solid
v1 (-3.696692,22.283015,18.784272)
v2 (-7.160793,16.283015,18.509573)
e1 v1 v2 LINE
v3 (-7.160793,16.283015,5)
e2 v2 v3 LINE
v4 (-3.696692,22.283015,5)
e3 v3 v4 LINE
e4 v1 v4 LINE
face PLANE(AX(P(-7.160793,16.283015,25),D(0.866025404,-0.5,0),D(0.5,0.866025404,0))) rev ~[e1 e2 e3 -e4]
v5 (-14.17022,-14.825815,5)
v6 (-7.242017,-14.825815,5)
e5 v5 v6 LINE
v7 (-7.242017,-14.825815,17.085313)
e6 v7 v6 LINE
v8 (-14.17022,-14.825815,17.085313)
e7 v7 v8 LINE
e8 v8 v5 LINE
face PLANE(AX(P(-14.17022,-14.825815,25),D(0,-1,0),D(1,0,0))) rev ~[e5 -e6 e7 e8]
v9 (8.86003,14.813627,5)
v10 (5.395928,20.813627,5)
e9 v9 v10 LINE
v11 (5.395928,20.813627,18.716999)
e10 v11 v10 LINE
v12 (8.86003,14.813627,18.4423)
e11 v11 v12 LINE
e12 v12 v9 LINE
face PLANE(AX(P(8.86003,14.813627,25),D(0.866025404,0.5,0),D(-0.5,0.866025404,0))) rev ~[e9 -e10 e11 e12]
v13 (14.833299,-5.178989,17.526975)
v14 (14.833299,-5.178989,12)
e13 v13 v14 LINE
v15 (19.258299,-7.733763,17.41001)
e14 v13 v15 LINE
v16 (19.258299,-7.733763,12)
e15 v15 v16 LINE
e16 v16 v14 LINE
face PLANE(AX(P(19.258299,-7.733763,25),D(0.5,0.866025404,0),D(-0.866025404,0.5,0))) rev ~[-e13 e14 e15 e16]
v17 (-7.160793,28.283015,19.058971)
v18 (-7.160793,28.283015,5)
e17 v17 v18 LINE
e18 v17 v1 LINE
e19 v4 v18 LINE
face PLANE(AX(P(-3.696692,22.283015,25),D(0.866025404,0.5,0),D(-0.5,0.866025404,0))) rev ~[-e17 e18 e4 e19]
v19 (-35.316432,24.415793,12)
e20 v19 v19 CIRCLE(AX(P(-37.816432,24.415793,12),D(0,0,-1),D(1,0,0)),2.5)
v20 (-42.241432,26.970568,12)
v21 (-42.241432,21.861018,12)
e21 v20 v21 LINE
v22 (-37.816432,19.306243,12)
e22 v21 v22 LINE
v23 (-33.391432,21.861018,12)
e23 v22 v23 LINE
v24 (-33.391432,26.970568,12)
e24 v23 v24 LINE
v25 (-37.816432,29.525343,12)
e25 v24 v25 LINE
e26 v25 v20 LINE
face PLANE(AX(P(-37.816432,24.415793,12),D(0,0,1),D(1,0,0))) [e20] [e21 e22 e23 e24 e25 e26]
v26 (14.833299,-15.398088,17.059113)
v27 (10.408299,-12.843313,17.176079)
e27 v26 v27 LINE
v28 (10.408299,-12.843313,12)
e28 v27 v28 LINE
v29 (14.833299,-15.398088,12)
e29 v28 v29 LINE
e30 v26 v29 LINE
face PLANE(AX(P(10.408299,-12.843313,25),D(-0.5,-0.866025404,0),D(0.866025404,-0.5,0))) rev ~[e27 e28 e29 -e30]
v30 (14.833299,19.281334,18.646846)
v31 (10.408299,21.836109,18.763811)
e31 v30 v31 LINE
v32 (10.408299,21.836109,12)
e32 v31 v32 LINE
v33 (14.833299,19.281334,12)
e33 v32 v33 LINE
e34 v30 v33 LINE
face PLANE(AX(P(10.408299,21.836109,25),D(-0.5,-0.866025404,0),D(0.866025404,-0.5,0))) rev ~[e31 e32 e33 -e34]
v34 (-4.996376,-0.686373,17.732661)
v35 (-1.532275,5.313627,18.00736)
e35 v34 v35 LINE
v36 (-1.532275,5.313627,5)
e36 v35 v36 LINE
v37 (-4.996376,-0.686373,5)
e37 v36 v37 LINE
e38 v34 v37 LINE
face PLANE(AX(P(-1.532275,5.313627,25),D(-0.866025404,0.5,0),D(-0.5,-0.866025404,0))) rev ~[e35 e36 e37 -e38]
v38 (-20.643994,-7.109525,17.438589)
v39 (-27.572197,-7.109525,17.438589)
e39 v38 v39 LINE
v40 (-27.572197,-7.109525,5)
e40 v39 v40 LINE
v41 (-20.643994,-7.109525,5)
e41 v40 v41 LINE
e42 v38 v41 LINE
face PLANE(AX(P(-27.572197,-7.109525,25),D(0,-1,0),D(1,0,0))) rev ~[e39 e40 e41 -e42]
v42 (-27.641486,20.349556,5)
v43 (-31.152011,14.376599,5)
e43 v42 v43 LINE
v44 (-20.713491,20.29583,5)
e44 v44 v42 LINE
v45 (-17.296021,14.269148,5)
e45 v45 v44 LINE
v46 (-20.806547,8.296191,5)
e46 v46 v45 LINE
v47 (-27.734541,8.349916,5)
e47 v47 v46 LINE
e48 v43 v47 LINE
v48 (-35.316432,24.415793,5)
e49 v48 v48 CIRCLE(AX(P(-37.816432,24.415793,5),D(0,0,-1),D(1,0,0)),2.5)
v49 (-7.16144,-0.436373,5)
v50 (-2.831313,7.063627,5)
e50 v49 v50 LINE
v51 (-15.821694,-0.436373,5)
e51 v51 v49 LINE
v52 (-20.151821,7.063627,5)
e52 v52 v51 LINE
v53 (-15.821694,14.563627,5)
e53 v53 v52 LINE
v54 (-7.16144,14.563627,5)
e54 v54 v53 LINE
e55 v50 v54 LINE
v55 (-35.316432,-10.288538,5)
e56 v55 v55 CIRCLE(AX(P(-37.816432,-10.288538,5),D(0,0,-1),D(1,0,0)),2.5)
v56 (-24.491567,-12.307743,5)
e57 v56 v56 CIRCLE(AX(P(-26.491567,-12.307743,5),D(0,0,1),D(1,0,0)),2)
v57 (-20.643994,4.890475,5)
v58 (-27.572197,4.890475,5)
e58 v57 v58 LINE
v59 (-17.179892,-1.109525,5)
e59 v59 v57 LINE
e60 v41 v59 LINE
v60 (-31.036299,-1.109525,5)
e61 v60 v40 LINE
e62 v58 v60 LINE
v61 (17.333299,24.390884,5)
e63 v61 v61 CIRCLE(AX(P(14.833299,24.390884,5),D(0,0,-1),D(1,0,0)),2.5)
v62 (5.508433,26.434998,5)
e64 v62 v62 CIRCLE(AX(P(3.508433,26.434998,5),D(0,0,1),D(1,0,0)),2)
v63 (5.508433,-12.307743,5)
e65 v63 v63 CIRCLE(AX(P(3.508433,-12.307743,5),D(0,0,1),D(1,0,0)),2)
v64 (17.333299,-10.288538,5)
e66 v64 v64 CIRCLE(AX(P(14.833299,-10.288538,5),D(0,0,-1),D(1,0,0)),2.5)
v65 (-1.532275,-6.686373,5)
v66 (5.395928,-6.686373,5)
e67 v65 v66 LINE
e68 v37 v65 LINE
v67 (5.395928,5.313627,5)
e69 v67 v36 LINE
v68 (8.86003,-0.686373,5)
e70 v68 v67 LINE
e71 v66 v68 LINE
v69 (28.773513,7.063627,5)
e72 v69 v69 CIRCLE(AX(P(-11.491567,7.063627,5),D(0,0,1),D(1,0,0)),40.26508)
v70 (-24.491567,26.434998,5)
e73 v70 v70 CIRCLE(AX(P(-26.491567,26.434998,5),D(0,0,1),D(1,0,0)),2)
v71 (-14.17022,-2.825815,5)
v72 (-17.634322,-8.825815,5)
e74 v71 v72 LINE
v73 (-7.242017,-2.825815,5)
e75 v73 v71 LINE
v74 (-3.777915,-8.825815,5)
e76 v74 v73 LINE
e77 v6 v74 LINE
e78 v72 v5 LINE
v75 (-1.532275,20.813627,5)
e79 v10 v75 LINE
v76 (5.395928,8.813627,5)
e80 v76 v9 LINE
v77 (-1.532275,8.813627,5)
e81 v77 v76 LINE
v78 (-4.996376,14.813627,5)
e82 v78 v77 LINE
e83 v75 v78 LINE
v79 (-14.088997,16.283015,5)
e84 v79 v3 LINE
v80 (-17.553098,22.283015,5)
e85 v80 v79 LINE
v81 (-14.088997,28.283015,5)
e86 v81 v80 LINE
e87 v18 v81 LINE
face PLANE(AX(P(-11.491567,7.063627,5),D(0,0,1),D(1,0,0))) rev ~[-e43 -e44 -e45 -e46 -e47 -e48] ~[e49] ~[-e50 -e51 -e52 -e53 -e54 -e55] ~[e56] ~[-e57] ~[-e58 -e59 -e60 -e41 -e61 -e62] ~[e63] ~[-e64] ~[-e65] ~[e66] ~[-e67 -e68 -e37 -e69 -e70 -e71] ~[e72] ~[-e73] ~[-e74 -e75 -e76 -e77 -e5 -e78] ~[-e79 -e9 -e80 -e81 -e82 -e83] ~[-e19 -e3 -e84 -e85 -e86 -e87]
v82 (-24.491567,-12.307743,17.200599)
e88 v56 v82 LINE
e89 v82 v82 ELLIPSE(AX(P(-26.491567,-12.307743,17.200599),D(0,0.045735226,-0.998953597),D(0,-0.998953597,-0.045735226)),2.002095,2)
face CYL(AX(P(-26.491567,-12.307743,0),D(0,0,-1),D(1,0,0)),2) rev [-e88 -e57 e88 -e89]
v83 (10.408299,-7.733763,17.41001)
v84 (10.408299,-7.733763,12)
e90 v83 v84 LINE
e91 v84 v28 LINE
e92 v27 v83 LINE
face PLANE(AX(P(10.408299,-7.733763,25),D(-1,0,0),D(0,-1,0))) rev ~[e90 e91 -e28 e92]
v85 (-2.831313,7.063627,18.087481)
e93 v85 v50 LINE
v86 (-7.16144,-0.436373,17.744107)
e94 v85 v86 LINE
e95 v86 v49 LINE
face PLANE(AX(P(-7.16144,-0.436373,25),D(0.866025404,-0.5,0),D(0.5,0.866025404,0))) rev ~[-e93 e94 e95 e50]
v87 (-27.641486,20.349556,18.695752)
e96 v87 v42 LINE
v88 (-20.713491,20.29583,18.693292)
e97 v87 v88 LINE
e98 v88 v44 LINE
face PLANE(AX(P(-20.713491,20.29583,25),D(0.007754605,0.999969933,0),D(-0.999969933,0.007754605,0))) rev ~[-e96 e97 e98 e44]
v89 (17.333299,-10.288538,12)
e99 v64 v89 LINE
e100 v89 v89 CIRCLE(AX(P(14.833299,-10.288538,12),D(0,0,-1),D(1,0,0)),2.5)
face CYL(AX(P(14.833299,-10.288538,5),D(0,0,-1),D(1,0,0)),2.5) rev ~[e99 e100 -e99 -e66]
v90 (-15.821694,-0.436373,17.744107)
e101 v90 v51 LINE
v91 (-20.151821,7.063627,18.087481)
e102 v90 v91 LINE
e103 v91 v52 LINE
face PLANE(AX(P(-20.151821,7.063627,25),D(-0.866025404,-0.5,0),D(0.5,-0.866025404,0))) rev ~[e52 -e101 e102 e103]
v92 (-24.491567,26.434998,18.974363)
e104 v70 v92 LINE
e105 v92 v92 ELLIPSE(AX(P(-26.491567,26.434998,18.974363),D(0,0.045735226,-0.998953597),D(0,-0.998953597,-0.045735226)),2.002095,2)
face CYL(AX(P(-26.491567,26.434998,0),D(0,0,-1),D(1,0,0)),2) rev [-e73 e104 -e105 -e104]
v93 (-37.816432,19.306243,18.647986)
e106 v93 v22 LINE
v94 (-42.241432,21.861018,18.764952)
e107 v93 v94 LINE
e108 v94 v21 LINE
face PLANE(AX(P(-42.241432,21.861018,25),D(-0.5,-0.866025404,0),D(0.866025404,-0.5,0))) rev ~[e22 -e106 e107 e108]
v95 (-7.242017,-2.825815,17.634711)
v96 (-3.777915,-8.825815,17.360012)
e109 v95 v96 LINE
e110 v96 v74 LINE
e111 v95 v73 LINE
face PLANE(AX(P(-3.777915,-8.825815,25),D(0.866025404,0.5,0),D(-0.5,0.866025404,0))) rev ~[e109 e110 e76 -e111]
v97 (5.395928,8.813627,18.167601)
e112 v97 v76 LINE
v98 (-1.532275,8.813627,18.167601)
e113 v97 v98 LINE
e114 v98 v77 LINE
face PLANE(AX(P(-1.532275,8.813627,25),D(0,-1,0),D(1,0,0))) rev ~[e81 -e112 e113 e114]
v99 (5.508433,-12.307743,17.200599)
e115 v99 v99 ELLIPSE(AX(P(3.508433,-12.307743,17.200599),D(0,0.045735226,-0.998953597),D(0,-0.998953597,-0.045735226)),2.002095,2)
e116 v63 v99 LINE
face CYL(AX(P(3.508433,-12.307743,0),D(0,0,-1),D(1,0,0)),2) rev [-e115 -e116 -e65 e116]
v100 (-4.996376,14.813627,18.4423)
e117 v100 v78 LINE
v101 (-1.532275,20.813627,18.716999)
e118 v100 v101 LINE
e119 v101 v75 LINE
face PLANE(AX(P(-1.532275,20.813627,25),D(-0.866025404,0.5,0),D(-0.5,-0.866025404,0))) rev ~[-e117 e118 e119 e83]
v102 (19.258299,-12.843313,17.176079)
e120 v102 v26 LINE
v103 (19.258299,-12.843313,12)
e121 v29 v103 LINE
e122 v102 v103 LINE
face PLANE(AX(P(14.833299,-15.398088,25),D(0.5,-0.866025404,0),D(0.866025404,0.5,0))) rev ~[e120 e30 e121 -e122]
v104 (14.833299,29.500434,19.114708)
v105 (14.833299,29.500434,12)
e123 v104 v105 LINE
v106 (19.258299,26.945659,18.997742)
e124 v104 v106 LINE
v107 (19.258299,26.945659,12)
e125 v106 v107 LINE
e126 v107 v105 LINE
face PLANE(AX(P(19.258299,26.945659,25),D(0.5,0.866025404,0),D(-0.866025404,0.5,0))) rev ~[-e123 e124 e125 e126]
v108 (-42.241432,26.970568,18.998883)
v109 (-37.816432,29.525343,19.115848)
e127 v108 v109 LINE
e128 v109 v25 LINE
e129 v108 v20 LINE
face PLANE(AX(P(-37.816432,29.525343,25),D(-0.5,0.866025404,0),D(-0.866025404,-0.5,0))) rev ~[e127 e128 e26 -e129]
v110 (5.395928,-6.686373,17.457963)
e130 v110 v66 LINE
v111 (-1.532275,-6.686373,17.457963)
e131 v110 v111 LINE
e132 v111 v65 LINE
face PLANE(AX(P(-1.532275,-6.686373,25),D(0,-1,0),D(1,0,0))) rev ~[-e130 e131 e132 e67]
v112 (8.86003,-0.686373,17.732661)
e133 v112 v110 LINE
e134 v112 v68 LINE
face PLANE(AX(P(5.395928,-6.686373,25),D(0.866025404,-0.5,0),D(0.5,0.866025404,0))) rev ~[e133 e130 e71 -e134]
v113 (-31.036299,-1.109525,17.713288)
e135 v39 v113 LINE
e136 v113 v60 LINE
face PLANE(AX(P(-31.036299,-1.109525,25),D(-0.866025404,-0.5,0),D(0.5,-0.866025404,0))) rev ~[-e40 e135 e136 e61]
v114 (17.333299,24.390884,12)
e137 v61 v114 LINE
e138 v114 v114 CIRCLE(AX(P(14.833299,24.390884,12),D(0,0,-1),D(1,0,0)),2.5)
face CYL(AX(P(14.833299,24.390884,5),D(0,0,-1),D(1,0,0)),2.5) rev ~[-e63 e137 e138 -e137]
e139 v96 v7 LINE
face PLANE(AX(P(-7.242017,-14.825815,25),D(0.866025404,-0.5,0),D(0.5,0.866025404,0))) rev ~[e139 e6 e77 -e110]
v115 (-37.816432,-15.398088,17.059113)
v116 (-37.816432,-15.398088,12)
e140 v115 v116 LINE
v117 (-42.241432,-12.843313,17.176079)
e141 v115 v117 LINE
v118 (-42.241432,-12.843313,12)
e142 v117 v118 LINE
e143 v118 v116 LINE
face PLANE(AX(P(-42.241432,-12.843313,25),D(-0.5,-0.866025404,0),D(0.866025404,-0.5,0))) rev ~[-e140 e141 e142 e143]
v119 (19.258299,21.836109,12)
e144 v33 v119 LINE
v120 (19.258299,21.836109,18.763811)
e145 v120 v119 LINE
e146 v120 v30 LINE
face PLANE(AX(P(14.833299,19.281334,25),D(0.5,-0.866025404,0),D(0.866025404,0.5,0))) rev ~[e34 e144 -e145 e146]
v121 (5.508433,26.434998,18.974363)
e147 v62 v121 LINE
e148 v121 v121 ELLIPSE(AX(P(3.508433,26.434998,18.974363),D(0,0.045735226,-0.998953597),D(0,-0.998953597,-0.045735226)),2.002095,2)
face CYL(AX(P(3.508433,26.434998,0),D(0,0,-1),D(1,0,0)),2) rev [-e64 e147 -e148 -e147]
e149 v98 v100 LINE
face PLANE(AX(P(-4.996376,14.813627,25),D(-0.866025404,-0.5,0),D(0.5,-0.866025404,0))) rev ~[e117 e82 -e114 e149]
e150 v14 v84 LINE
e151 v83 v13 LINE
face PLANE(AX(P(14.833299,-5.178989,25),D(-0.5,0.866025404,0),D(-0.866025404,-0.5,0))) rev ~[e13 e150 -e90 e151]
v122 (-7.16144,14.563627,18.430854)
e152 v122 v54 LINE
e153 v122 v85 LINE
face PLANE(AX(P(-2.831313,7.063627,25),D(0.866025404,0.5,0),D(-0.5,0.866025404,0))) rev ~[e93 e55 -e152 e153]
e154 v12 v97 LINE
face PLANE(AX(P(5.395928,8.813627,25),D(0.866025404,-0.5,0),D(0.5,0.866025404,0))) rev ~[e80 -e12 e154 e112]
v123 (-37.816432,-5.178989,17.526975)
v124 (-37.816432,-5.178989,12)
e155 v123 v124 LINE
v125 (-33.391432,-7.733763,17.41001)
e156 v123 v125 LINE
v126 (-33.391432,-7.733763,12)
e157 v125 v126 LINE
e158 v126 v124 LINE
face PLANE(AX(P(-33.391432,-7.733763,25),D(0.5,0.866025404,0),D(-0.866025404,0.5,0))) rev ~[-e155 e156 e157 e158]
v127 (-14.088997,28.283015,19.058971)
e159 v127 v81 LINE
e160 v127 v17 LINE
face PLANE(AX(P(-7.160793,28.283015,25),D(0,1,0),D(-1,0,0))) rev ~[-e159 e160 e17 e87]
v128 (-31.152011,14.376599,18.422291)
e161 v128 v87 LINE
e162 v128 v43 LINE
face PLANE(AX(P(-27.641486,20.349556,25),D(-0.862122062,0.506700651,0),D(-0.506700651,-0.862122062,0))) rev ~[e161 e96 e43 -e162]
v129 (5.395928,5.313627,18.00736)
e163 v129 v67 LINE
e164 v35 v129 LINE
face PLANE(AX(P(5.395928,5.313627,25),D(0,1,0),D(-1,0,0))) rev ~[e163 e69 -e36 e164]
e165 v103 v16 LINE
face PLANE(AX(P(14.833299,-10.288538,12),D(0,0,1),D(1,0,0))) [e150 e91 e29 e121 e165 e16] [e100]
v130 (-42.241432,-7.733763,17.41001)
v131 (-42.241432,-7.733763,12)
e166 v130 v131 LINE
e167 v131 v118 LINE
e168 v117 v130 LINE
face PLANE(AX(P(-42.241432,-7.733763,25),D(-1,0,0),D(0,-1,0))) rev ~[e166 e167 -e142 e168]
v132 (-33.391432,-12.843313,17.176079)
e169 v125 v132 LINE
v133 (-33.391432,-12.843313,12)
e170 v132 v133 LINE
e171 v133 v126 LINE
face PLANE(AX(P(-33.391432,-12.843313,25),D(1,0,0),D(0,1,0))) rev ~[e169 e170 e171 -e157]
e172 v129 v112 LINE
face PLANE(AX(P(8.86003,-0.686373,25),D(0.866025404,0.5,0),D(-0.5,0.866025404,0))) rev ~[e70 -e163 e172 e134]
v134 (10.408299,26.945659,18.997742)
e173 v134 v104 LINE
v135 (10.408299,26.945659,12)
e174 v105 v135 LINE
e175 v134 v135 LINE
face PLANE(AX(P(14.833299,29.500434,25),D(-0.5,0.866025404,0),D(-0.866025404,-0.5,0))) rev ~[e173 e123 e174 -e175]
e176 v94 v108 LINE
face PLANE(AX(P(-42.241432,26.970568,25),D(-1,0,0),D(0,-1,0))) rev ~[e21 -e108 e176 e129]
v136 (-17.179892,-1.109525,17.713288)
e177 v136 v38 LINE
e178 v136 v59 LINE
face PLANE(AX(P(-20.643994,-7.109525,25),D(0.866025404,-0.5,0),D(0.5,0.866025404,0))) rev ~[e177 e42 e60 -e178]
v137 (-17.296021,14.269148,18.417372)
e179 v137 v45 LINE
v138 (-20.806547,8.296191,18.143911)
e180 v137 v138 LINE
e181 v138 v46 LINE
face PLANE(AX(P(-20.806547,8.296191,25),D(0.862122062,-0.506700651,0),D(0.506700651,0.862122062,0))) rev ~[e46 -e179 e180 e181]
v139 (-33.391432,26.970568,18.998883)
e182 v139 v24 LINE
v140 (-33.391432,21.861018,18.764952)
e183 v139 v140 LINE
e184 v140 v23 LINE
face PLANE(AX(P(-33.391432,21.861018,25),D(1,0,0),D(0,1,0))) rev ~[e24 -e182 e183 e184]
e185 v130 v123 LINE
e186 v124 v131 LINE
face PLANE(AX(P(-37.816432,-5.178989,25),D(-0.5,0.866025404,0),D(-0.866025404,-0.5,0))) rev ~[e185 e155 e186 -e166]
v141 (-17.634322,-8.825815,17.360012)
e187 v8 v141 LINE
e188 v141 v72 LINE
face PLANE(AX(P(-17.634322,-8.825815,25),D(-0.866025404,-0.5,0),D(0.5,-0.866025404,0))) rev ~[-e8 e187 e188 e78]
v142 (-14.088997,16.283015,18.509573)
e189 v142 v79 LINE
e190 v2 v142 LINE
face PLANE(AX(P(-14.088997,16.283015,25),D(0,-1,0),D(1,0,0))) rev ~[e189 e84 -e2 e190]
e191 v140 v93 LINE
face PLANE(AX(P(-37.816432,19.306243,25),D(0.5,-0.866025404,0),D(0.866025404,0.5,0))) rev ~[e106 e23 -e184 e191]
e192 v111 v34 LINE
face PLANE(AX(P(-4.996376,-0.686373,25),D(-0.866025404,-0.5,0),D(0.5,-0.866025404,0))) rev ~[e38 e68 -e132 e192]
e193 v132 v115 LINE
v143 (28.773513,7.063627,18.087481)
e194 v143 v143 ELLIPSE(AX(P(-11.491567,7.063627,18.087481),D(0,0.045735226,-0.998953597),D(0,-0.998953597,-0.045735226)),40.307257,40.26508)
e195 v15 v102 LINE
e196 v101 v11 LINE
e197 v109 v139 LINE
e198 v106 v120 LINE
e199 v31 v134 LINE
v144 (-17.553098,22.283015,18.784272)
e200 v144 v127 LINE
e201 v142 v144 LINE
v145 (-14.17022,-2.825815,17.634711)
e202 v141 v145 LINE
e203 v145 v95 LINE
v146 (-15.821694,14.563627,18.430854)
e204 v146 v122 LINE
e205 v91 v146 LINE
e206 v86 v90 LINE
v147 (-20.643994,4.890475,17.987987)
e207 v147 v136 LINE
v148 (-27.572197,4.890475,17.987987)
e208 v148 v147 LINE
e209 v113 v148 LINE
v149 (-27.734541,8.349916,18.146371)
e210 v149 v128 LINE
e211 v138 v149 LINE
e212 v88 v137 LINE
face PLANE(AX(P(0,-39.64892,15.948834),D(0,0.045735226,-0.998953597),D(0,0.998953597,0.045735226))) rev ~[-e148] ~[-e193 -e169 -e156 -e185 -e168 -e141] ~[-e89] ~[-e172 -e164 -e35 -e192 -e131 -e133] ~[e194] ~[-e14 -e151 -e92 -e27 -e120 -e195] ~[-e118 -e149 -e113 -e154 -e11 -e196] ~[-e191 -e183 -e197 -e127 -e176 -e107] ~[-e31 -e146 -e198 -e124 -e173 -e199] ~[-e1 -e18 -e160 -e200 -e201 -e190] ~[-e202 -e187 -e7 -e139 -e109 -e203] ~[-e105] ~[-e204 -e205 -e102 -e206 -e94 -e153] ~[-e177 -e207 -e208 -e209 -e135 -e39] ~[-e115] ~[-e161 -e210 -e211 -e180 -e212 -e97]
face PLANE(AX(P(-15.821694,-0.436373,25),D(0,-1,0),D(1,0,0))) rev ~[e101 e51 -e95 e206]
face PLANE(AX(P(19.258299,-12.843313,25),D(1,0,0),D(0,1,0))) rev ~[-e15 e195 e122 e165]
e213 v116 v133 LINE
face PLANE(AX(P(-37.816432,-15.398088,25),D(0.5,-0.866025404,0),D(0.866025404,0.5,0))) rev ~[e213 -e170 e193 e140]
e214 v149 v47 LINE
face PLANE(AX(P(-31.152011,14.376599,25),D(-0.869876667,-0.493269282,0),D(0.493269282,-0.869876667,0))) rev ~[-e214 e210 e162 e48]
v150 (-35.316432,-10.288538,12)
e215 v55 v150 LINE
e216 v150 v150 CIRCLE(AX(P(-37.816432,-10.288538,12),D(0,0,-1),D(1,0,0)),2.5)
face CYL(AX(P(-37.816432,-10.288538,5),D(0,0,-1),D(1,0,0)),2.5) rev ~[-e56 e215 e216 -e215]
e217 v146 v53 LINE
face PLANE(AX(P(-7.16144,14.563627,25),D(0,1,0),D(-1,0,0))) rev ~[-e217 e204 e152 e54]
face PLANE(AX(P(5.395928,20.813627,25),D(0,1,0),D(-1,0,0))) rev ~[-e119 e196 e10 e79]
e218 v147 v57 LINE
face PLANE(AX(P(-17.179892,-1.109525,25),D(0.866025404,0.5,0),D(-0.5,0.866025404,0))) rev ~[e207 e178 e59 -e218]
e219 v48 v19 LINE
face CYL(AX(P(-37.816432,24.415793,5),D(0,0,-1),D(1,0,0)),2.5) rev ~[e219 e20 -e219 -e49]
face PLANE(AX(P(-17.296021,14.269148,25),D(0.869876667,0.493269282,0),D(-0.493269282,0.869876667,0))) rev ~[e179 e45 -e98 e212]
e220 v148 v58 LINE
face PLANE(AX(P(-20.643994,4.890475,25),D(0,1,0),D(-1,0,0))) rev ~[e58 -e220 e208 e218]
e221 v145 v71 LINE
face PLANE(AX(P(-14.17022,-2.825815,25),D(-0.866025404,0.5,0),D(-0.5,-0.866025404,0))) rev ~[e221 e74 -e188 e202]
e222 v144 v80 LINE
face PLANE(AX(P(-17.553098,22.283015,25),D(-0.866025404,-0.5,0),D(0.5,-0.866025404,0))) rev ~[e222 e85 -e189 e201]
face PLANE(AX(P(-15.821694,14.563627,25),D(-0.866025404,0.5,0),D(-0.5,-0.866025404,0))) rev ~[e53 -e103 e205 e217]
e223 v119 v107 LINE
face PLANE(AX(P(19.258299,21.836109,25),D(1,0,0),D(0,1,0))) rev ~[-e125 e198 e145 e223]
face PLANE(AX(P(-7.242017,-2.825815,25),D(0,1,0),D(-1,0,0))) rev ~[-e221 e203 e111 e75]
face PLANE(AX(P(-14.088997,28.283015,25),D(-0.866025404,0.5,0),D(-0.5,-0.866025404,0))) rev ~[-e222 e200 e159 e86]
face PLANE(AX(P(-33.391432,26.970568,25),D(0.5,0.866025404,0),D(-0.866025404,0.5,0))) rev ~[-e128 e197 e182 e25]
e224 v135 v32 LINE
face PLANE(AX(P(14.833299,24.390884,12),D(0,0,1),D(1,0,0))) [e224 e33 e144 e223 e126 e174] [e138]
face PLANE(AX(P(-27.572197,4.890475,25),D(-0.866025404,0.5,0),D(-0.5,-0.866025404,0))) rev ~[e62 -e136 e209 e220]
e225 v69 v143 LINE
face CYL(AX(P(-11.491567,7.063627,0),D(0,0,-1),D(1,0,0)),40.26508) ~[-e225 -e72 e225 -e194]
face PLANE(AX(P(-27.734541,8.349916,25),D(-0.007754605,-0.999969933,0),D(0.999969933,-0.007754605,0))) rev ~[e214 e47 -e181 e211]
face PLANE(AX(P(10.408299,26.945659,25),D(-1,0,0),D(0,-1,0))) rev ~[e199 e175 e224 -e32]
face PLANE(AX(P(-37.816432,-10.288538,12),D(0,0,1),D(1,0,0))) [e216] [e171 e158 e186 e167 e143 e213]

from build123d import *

# Parameters (mm, degrees)
F0_R      = 40.2650795079
F0_R_2    = 2
F2_DEPTH  = 20
F4_DEPTH  = 69.8
F6_DEPTH  = 25.001
F7_DEPTH  = 5
F8_R      = 2.5
F9_DEPTH  = 14.9319422489
F11_DEPTH = 13


# Not quite as in the source:
# - a feature names something its author has since deleted; it is built from what else it names


with BuildPart() as f2:
    # F0 (on Top) → F2 (new body)
    with BuildSketch(Plane.XY):
        with Locations((-11.4915669638, 7.0636273592)):
            Circle(F0_R)
        with Locations((-26.4915669638, -12.3077432686)):
            Circle(F0_R_2, mode=Mode.SUBTRACT)
        with Locations((3.5084330362, -12.3077432686)):
            Circle(F0_R_2, mode=Mode.SUBTRACT)
        with Locations((-26.4915669638, 26.434997987)):
            Circle(F0_R_2, mode=Mode.SUBTRACT)
        with Locations((3.5084330362, 26.434997987)):
            Circle(F0_R_2, mode=Mode.SUBTRACT)
    extrude(amount=F2_DEPTH)

    # F3 (on Right) → F4 (cut, symmetric)
    with BuildSketch(Plane.YZ):
        Polygon((-43.8041239977, 30.4956686149), (-39.6489202976, 15.9488338977), (68.1266114116, 20.8831354976), (67.6865195207, 30.4956686149), align=None)
    extrude(amount=F4_DEPTH, both=True, mode=Mode.SUBTRACT)

    # F5 (on offset) → F6 (cut, through all)
    with BuildSketch(Plane.XY.offset(25)):
        Polygon((-4.9963764354, 14.8136273592), (-1.5322748203, 8.8136273592), (5.39592841, 8.8136273592), (8.8600300251, 14.8136273592), (5.39592841, 20.8136273592), (-1.5322748203, 20.8136273592), align=None)
        Polygon((-1.5322748203, 5.3136273592), (-4.9963764354, -0.6863726408), (-1.5322748203, -6.6863726408), (5.39592841, -6.6863726408), (8.8600300251, -0.6863726408), (5.39592841, 5.3136273592), align=None)
        Polygon((-14.170220135, -2.8258145228), (-17.6343217501, -8.8258145228), (-14.170220135, -14.8258145228), (-7.2420169047, -14.8258145228), (-3.7779152896, -8.8258145228), (-7.2420169047, -2.8258145228), align=None)
        Polygon((-27.5721969216, 4.890474733), (-31.0362985367, -1.109525267), (-27.5721969216, -7.109525267), (-20.6439936913, -7.109525267), (-17.1798920761, -1.109525267), (-20.6439936913, 4.890474733), align=None)
        Polygon((-7.1614399449, 14.5636273592), (-15.8216939827, 14.5636273592), (-20.1518210017, 7.0636273592), (-15.8216939827, -0.4363726408), (-7.1614399449, -0.4363726408), (-2.831312926, 7.0636273592), align=None)
        Polygon((-27.6414862443, 20.3495556396), (-31.1520113303, 14.3765987822), (-27.7345414991, 8.3499164484), (-20.8065465819, 8.296190972), (-17.2960214958, 14.2691478294), (-20.7134913271, 20.2958301632), align=None)
        Polygon((-14.0889966993, 28.28301467), (-17.5530983144, 22.28301467), (-14.0889966993, 16.28301467), (-7.160793469, 16.28301467), (-3.6966918539, 22.28301467), (-7.160793469, 28.28301467), align=None)
    extrude(amount=-F6_DEPTH, mode=Mode.SUBTRACT)

    # F7 (cut): a face of the model
    f7_faces = [f2.faces().sort_by_distance(p)[0] for p in [
        (-50.6177780411, 7.0636273592, 0),
    ]]
    extrude(f7_faces, amount=-F7_DEPTH, mode=Mode.SUBTRACT)

    # F8 (on face) → F9 (cut, through all)
    with BuildSketch(Plane(origin=(0, 0, 5), x_dir=(1, 0, 0), z_dir=(0, 0, -1))):
        with Locations((14.8332985118, 10.2885384113)):
            Circle(F8_R)
        with Locations((14.8332985118, -24.3908837438)):
            Circle(F8_R)
        with Locations((-37.8164324394, -24.4157931297)):
            Circle(F8_R)
        with Locations((-37.8164324394, 10.2885384113)):
            Circle(F8_R)
    extrude(amount=-F9_DEPTH, mode=Mode.SUBTRACT)

    # F10 (on offset) → F11 (cut)
    with BuildSketch(Plane.XY.offset(25)):
        Polygon((19.2582985118, -12.8433133524), (19.2582985118, -7.7337634701), (14.8332985118, -5.1789885289), (10.4082985118, -7.7337634701), (10.4082985118, -12.8433133524), (14.8332985118, -15.3980882936), align=None)
        Polygon((19.2582985118, 21.8361088026), (19.2582985118, 26.9456586849), (14.8332985118, 29.5004336261), (10.4082985118, 26.9456586849), (10.4082985118, 21.8361088026), (14.8332985118, 19.2813338614), align=None)
        Polygon((-33.3914324394, 21.8610181886), (-33.3914324394, 26.9705680709), (-37.8164324394, 29.5253430121), (-42.2414324394, 26.9705680709), (-42.2414324394, 21.8610181886), (-37.8164324394, 19.3062432474), align=None)
        Polygon((-33.3914324394, -12.8433133524), (-33.3914324394, -7.7337634701), (-37.8164324394, -5.1789885289), (-42.2414324394, -7.7337634701), (-42.2414324394, -12.8433133524), (-37.8164324394, -15.3980882936), align=None)
    extrude(amount=-F11_DEPTH, mode=Mode.SUBTRACT)


solid = f2.part
